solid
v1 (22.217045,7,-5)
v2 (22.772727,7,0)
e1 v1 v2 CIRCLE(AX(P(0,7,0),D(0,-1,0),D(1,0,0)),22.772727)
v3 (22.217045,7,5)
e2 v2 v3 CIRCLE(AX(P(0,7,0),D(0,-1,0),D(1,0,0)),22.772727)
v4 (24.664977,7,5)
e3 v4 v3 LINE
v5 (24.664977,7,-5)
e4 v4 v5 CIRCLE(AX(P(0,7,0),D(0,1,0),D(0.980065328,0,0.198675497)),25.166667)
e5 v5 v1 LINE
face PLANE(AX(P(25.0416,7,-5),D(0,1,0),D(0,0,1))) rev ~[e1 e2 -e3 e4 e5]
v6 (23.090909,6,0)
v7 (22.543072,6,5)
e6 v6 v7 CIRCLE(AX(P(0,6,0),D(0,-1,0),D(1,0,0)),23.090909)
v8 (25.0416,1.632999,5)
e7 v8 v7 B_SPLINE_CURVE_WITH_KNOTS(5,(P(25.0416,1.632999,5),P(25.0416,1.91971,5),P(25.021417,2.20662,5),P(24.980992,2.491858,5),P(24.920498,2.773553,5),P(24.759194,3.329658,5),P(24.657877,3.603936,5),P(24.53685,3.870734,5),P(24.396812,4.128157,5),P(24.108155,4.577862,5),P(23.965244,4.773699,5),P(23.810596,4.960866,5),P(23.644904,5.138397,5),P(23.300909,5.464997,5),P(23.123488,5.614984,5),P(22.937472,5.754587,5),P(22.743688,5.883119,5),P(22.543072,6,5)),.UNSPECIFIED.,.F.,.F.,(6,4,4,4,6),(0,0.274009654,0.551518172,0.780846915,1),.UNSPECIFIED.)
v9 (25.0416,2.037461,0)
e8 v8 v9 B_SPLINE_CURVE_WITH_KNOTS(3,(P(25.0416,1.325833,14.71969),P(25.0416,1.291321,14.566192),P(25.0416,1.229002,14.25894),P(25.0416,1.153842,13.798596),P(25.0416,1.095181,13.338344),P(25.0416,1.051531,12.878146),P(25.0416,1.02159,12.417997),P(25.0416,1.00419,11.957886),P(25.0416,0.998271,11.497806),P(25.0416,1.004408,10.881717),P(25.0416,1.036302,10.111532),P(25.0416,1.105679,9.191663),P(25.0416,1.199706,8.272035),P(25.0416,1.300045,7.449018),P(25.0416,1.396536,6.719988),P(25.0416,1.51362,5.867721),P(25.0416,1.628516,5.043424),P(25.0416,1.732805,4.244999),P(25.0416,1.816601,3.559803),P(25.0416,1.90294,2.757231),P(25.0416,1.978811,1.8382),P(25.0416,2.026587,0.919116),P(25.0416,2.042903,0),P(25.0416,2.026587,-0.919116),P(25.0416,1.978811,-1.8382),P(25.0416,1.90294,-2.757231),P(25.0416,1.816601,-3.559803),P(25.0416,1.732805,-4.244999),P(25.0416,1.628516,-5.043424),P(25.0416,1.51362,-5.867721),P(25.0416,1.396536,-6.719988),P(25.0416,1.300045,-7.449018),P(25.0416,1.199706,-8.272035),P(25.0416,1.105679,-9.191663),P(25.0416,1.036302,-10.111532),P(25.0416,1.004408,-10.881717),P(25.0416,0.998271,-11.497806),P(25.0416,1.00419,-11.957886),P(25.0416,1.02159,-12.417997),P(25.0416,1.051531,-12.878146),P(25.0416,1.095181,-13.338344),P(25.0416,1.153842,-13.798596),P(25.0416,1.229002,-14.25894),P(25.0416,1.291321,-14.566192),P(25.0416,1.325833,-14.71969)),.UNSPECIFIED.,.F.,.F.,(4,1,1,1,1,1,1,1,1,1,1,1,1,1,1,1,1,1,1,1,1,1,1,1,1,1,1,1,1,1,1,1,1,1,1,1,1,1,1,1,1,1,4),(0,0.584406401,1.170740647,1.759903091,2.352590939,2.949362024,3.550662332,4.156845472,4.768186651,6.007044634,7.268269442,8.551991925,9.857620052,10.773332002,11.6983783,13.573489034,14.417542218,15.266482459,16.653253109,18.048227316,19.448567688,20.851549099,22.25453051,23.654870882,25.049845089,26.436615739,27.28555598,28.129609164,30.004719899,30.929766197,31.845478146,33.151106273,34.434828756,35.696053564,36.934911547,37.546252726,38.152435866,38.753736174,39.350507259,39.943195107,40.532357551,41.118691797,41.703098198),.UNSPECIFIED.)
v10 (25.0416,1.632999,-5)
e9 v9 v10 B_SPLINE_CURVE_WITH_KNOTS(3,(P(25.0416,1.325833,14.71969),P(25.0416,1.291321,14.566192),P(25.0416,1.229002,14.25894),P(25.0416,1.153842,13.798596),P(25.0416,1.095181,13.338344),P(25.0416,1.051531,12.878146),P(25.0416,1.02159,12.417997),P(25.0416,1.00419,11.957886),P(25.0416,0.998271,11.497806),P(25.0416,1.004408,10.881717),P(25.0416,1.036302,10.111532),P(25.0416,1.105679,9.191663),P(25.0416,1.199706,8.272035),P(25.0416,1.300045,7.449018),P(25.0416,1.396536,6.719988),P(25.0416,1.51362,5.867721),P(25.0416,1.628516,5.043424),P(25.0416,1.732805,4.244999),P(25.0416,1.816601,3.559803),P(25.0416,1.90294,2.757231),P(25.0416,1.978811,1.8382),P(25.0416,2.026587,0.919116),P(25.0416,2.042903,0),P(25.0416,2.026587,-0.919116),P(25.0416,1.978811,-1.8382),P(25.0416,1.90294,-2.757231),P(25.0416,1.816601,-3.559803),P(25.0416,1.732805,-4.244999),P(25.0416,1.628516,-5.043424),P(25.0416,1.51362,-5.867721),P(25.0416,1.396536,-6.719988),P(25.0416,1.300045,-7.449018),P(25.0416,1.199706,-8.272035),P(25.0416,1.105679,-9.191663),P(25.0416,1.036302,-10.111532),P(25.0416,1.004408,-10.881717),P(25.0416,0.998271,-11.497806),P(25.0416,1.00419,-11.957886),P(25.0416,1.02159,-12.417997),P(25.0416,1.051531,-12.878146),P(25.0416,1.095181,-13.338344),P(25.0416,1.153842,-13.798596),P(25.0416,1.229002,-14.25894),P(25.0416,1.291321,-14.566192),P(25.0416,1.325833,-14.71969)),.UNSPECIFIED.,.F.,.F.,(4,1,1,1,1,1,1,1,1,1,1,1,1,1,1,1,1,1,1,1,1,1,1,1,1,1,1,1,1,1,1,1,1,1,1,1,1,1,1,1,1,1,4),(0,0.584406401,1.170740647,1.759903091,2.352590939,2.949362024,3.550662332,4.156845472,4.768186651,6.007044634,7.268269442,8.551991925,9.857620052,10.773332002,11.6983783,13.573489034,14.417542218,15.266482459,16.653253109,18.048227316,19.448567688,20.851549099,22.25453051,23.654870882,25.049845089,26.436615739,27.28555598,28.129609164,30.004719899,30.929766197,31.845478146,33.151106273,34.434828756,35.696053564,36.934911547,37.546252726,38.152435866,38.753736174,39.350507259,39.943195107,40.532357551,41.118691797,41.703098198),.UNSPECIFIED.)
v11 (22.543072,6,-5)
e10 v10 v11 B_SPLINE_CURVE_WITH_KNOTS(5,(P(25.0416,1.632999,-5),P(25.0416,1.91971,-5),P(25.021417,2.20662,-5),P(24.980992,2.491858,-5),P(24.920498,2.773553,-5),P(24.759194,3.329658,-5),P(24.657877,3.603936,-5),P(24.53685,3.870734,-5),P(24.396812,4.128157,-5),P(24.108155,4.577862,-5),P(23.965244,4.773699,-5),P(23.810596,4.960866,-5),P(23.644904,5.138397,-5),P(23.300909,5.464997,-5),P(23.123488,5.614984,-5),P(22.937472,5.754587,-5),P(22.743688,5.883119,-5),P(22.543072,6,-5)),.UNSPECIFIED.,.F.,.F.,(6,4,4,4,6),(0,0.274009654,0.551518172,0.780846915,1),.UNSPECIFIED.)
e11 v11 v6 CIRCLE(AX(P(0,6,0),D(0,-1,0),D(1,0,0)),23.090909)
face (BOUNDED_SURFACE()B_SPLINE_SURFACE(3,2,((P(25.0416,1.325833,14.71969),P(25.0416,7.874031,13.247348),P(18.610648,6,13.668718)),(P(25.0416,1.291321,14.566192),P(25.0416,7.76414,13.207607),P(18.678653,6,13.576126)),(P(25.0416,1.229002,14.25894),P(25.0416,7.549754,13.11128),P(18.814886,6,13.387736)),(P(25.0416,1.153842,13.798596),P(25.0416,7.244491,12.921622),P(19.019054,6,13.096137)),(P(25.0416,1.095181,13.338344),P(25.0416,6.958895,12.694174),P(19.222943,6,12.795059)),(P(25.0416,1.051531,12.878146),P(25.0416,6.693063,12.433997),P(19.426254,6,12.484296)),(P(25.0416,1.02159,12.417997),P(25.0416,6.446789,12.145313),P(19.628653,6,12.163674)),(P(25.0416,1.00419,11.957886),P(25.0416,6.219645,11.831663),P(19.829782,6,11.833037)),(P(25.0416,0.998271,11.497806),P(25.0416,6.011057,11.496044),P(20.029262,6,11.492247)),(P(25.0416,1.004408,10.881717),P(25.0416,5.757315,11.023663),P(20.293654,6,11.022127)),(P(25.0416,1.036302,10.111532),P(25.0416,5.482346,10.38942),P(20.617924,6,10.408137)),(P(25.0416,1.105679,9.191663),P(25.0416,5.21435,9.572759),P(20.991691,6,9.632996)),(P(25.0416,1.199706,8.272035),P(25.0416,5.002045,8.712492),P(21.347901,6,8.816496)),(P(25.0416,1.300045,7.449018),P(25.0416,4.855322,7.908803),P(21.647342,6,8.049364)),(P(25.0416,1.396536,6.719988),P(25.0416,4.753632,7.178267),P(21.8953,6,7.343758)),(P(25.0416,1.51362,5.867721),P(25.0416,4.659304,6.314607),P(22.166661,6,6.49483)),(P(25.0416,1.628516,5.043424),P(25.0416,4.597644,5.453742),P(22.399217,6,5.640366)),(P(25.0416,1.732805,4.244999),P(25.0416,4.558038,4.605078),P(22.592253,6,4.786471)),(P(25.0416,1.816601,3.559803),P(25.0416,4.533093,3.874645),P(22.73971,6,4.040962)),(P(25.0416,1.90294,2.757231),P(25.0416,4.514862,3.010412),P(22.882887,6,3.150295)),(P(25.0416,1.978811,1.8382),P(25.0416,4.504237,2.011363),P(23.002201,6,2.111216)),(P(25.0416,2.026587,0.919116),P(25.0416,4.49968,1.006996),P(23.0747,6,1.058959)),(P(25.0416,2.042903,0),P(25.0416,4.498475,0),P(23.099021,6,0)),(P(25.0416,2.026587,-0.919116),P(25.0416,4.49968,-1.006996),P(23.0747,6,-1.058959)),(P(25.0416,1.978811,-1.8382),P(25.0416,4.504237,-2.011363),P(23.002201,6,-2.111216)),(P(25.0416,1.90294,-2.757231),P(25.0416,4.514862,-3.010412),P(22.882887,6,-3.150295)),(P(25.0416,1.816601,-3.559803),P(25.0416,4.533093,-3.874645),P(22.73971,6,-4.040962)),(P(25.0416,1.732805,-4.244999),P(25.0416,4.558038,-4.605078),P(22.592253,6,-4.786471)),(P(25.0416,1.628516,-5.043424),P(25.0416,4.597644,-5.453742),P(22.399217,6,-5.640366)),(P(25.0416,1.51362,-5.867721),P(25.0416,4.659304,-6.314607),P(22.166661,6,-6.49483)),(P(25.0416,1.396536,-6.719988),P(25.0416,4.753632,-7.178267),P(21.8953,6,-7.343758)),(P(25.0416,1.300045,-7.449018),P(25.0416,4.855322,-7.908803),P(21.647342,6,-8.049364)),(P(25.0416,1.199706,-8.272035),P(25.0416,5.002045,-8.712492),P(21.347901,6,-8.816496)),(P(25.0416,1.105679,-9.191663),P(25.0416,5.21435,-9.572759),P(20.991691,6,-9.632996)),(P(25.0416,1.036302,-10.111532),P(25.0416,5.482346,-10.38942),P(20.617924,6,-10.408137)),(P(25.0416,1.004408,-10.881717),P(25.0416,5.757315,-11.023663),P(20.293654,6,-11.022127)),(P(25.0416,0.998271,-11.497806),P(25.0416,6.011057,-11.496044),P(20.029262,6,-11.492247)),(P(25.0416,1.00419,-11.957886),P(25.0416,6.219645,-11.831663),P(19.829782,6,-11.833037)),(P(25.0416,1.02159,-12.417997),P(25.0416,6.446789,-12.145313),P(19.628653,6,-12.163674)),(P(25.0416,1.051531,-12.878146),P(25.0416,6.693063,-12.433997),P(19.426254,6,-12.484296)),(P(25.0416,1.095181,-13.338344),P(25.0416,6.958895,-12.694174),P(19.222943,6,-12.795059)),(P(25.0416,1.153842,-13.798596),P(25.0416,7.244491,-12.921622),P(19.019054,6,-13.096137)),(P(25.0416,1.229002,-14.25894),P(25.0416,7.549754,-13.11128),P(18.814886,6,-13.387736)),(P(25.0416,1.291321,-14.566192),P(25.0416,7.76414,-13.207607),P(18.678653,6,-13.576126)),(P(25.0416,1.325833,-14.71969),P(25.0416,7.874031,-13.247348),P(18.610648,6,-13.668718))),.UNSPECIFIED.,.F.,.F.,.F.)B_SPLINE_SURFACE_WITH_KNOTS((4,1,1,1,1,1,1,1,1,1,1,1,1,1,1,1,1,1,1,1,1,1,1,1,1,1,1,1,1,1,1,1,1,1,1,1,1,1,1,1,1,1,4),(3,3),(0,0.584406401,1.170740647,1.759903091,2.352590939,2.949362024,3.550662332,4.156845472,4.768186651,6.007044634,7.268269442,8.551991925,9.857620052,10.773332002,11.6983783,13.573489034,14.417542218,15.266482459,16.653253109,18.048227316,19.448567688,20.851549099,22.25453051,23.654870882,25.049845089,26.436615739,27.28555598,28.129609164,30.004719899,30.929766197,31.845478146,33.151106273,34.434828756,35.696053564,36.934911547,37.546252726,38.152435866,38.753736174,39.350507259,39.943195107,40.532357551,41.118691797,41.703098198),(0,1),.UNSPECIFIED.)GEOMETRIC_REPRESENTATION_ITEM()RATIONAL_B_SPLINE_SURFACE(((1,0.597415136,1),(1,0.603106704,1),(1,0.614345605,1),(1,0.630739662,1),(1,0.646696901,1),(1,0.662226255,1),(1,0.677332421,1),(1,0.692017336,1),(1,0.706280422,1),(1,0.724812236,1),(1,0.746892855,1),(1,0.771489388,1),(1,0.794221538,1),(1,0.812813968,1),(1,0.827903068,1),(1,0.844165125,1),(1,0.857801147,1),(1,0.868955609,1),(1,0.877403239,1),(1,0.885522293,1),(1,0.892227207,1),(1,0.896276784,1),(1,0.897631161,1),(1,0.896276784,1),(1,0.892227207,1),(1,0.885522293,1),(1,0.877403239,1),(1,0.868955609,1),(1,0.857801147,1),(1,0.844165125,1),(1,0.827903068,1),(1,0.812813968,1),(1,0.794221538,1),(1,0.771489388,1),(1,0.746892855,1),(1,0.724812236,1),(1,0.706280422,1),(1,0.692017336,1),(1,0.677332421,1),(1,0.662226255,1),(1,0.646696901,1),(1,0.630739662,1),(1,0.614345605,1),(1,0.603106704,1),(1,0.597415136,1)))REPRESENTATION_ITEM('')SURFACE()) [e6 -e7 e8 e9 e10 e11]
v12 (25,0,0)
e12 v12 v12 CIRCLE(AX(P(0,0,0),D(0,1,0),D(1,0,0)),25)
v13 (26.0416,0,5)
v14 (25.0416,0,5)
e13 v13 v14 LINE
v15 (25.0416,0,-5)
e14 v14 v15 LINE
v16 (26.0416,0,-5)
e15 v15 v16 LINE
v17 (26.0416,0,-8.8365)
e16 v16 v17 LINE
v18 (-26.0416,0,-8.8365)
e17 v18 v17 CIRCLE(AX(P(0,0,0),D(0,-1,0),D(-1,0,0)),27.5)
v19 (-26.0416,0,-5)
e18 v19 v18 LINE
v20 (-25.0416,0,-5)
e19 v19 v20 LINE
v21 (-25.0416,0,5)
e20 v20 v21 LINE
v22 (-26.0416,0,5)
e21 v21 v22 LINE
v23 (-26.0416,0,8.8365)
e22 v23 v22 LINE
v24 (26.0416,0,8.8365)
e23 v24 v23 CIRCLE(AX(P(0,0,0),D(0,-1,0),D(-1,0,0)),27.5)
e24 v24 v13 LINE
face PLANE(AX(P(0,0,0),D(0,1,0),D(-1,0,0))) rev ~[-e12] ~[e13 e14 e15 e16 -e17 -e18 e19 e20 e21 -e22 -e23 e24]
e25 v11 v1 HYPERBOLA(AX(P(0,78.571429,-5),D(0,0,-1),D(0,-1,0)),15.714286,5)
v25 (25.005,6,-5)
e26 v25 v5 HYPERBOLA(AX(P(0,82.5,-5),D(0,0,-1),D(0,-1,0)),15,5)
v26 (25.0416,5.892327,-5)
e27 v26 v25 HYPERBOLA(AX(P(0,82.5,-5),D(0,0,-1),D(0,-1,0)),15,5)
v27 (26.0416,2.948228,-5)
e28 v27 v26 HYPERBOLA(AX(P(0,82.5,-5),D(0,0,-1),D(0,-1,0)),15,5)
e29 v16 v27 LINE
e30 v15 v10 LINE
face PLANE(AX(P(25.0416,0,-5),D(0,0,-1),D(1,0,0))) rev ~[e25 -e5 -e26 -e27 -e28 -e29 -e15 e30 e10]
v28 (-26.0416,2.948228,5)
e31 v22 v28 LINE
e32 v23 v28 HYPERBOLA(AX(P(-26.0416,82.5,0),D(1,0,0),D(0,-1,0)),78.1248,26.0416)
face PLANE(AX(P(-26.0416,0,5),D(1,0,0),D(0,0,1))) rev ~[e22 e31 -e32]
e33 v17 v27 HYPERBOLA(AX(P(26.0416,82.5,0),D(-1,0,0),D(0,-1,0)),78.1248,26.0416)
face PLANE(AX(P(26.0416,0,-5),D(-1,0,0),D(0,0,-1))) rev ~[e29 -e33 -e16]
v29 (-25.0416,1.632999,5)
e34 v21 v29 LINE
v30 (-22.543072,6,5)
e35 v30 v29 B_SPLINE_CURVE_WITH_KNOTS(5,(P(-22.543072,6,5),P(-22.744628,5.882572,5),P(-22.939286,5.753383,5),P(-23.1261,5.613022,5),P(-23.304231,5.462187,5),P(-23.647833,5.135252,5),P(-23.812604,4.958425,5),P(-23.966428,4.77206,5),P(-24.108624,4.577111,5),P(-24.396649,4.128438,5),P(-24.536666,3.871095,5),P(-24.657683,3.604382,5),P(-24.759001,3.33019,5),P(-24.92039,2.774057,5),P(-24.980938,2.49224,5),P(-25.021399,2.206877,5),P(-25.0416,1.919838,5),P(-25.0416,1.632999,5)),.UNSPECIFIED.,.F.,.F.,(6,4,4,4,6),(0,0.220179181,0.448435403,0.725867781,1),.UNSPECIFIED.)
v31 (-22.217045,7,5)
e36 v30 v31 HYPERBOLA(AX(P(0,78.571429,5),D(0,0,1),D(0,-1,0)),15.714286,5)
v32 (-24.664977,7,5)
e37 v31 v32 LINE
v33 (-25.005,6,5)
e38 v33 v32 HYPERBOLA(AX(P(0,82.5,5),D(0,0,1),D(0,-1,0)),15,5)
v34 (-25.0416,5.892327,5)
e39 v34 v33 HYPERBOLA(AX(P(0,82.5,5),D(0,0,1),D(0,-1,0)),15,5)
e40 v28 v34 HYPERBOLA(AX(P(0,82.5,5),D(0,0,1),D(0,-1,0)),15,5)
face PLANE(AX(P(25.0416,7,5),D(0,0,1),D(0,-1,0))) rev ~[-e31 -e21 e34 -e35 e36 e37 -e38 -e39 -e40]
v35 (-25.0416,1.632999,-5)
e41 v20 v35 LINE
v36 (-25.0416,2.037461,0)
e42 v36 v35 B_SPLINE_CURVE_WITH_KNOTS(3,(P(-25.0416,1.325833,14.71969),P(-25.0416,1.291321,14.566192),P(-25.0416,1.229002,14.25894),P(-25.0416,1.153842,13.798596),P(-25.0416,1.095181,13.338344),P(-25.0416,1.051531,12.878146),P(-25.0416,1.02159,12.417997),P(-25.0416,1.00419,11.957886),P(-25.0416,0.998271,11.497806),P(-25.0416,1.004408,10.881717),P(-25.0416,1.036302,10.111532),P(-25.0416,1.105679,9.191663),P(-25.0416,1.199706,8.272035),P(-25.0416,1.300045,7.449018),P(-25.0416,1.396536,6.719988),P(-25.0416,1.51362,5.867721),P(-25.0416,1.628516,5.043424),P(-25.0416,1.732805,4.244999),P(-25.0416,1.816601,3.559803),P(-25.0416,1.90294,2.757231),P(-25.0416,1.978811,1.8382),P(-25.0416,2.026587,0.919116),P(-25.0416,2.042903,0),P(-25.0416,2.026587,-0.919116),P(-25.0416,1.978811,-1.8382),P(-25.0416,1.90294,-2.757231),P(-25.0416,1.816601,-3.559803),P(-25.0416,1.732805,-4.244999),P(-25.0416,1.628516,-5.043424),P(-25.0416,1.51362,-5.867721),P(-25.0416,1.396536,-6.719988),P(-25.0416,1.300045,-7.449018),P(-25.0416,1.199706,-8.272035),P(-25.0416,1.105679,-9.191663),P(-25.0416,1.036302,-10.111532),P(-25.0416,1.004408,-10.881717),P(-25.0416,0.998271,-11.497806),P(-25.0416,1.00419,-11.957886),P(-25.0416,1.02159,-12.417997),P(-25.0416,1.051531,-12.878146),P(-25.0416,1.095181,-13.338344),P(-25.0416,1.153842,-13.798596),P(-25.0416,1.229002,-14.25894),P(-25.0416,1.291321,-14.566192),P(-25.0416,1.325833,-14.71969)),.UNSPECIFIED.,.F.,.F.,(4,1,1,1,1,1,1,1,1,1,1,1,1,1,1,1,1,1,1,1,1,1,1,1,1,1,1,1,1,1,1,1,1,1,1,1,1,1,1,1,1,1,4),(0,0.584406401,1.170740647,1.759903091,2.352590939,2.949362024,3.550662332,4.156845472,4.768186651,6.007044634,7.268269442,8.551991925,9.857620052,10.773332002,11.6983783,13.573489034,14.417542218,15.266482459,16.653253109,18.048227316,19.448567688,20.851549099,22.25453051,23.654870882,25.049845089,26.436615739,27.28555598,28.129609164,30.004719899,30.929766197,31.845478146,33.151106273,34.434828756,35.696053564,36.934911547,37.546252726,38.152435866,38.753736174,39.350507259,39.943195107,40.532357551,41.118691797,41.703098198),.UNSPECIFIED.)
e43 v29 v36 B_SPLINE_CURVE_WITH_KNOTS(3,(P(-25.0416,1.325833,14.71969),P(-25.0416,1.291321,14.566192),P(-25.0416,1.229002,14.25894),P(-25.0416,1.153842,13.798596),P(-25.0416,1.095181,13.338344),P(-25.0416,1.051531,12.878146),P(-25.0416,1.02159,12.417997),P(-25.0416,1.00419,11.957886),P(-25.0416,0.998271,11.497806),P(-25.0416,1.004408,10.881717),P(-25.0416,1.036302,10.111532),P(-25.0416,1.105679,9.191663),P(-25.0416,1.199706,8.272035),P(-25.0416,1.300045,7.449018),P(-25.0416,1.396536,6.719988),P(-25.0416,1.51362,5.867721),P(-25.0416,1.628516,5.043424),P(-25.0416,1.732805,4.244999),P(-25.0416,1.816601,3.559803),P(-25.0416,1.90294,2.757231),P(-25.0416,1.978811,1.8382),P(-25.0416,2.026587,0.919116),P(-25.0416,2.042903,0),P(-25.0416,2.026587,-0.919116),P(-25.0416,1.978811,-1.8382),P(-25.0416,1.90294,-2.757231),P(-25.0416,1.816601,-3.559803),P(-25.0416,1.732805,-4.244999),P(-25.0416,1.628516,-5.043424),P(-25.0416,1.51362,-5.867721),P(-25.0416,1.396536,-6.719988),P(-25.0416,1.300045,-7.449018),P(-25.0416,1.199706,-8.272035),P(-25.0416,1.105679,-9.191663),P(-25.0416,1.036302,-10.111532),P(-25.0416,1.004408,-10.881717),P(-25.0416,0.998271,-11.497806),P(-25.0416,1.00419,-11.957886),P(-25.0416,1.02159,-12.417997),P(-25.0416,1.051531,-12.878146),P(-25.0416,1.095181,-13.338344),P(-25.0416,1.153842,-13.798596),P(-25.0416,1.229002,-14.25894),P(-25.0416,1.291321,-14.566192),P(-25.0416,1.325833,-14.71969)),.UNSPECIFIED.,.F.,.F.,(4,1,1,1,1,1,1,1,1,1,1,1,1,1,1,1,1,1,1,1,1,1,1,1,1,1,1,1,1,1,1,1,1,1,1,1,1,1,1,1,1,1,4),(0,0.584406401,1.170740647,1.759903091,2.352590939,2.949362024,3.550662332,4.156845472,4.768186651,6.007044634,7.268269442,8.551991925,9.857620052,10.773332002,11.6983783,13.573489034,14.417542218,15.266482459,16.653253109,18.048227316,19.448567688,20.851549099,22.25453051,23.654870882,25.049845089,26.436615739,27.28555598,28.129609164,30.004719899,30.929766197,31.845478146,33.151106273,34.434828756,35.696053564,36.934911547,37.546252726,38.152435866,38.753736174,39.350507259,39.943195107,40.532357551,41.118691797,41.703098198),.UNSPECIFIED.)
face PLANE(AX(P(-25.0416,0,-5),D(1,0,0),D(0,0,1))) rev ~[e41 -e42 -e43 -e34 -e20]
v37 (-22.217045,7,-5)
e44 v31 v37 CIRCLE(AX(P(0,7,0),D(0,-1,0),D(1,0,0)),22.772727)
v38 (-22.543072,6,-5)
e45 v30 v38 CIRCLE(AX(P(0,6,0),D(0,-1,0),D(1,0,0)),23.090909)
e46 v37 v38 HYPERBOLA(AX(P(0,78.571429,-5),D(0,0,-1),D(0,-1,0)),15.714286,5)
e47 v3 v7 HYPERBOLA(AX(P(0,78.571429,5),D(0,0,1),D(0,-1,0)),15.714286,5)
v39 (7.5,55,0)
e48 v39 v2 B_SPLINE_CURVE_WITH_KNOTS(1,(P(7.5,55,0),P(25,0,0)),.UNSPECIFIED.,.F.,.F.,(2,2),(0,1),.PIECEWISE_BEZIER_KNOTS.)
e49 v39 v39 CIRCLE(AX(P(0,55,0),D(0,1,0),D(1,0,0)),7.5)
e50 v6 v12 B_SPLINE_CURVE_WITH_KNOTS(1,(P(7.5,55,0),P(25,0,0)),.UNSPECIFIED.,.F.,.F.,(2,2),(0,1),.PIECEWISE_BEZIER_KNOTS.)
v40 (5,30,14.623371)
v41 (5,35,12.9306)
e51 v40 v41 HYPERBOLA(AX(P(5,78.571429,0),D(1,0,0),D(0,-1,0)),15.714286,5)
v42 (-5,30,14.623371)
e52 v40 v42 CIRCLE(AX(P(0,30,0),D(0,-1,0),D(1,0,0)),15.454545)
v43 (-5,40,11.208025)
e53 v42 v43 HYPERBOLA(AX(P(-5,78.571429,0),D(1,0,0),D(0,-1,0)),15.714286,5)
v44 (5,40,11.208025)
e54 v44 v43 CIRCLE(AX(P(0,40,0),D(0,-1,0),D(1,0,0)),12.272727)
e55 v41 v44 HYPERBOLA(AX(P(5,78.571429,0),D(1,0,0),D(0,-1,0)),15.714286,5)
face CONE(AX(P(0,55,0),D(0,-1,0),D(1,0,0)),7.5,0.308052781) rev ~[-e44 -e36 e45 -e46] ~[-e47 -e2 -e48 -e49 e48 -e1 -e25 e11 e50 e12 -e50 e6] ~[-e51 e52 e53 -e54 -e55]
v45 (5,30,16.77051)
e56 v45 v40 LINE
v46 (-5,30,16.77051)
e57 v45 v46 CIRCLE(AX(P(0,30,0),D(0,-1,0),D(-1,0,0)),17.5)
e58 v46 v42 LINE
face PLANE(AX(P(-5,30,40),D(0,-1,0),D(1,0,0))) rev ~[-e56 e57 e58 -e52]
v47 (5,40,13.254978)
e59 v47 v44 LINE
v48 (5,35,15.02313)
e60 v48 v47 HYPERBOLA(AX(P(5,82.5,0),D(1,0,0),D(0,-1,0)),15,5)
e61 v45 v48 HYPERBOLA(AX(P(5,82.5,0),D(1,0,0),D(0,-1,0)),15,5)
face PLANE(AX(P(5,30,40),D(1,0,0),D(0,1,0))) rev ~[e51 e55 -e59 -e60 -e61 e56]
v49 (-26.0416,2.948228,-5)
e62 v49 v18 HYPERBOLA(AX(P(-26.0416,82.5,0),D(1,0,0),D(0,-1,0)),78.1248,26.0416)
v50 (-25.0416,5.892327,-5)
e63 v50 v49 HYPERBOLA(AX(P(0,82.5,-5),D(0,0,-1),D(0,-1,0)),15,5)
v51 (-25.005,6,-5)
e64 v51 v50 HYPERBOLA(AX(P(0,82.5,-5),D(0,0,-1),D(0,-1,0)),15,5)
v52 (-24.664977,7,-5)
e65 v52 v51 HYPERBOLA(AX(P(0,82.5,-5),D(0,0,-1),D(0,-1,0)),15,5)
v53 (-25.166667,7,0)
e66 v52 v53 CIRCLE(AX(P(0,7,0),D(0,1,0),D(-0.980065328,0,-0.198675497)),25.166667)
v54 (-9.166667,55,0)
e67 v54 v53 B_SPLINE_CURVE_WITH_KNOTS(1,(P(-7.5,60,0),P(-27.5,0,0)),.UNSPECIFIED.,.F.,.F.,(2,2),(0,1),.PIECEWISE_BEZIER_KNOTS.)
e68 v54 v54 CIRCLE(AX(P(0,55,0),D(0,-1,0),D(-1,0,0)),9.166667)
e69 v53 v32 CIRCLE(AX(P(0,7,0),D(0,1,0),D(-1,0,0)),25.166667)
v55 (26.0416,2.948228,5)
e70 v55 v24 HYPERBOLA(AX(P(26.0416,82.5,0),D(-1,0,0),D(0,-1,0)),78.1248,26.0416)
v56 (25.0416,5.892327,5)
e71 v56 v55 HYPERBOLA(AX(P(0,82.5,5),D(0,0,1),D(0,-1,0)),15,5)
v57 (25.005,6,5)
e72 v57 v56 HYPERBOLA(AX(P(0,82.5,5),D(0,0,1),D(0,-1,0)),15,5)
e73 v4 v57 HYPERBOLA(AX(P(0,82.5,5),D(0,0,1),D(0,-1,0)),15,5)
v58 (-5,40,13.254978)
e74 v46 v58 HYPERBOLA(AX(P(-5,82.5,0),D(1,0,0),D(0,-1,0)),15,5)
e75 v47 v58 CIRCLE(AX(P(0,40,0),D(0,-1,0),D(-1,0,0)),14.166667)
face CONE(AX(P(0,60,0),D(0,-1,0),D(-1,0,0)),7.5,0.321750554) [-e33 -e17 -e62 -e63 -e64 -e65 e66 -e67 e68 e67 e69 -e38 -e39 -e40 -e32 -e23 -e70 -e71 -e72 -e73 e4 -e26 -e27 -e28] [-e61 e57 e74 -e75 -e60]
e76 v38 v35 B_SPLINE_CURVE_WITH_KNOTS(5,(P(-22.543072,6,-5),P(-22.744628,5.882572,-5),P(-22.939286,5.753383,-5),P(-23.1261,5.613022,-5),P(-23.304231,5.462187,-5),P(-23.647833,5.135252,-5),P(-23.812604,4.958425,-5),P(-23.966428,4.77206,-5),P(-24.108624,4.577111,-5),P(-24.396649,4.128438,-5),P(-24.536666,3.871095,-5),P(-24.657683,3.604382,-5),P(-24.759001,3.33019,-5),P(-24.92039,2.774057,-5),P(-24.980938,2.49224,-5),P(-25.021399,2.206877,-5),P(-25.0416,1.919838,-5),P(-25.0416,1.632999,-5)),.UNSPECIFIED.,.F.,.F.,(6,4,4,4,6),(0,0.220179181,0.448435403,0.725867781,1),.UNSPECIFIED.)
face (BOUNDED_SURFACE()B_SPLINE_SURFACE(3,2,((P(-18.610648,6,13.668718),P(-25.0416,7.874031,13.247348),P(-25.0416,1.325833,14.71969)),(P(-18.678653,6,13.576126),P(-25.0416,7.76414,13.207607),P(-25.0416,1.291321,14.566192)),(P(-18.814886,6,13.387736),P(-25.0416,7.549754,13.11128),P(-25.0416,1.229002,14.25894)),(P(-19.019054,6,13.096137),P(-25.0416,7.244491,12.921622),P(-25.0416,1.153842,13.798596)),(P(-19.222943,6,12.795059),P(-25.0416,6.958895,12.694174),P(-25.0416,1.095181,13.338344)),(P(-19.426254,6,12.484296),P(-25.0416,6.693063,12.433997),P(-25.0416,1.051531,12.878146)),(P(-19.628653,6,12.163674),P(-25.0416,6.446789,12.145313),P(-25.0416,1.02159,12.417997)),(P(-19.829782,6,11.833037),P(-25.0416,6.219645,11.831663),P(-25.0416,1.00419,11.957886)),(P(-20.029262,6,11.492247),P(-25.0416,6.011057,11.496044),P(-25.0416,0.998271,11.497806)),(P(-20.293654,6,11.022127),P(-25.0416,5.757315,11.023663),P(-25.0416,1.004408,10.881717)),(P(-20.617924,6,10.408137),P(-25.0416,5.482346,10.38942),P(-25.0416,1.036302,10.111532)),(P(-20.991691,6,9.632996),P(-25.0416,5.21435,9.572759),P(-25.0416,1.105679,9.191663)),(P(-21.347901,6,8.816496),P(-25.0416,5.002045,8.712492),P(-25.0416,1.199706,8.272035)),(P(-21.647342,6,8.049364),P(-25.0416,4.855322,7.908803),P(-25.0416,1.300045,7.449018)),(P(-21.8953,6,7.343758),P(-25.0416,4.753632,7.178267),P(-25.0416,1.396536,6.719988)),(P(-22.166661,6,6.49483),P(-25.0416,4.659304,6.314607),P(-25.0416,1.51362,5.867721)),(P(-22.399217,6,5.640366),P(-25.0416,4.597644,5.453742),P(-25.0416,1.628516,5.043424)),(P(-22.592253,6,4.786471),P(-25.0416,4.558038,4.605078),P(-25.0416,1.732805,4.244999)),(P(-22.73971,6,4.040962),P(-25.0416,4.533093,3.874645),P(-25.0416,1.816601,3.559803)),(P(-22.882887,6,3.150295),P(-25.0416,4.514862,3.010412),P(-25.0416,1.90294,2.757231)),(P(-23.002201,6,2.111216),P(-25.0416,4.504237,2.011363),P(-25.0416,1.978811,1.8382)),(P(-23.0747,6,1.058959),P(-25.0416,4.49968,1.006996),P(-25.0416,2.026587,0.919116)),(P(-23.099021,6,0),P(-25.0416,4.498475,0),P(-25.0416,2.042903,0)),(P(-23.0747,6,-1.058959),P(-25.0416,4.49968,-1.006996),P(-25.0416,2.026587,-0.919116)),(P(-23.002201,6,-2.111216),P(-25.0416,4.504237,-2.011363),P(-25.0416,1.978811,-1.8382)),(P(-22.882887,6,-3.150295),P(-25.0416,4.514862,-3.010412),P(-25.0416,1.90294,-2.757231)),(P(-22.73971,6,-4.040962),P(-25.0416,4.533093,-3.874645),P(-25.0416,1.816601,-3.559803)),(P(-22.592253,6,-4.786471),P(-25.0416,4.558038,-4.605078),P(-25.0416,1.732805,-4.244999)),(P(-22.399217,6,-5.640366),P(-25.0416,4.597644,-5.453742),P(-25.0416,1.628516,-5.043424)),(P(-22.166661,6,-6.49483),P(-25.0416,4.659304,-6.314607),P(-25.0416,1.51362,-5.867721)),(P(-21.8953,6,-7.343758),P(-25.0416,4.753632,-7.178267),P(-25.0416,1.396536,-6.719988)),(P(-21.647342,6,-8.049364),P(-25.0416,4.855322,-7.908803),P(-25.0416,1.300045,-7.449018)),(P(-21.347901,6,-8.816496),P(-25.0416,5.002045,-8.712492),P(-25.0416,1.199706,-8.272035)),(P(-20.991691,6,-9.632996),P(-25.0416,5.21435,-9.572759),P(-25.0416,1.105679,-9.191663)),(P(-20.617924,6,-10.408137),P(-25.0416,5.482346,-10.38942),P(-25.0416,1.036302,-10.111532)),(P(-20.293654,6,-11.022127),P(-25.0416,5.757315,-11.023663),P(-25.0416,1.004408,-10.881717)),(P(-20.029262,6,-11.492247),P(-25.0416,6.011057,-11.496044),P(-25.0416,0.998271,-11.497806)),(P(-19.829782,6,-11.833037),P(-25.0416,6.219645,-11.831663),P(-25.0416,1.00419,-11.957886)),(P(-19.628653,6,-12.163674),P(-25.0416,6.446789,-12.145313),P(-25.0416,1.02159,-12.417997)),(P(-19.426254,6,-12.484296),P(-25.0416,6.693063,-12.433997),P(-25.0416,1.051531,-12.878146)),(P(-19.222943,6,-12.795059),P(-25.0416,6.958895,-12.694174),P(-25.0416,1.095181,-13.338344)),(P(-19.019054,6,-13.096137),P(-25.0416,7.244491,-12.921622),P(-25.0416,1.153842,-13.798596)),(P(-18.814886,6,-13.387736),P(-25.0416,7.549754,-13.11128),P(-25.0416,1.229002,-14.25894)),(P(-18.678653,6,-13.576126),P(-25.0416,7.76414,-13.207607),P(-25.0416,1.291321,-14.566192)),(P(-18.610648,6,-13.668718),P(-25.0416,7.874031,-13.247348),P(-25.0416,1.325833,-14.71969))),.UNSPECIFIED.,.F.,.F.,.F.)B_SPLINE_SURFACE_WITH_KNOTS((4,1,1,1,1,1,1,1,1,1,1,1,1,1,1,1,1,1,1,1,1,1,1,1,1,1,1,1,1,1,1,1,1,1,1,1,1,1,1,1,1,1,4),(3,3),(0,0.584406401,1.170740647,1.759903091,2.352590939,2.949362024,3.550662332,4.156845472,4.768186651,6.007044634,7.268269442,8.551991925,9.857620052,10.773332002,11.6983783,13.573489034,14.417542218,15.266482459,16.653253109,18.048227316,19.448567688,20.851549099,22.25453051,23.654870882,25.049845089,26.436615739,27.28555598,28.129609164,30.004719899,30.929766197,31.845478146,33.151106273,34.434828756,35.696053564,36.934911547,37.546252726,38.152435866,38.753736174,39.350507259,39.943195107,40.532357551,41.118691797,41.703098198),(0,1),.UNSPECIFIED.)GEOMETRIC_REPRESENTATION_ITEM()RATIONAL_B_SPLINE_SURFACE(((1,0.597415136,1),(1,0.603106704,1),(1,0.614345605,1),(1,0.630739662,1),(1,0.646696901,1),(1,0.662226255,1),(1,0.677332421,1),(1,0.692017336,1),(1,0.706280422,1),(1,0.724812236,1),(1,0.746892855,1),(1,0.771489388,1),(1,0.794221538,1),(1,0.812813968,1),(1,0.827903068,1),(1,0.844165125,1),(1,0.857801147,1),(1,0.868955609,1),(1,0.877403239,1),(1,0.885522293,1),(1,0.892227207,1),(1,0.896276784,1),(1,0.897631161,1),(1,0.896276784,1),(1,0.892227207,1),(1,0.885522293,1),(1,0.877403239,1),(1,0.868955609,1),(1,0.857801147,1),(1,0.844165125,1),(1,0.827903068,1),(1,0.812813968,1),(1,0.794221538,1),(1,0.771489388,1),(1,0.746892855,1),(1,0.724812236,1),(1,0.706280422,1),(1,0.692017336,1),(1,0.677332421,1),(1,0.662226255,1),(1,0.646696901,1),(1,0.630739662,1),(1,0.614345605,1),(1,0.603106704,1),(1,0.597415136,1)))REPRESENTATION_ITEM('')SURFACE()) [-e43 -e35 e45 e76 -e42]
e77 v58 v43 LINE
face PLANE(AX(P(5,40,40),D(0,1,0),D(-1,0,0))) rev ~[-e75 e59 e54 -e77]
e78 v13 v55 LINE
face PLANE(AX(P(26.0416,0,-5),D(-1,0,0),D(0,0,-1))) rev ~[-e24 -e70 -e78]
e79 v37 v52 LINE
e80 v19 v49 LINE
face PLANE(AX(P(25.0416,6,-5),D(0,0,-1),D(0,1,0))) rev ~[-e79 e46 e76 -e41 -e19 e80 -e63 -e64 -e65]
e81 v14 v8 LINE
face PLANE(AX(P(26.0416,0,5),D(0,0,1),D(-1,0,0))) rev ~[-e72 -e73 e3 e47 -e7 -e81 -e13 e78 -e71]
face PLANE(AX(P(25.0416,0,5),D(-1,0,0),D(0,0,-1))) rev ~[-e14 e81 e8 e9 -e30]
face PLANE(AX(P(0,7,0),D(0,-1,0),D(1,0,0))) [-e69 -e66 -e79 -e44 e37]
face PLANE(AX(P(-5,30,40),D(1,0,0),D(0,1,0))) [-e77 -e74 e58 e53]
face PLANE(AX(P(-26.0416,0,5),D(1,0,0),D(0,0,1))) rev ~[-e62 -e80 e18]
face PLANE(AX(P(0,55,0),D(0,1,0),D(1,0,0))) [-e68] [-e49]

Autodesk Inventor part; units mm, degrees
ref_plane "YZ Plane" through (0, 0, 0) normal (1, 0, 0) x (0, 1, 0)
ref_plane "XZ Plane" through (0, 0, 0) normal (0, 1, 0) x (-1, 0, 0)
ref_plane "XY Plane" through (0, 0, 0) normal (0, 0, 1) x (1, 0, 0)
sketch "Sketch1" plane through (0, 0, 0) normal (0, 1, 0) x (-1, 0, 0)
  point P0 (0, 0)
sketch "Sketch2" plane through (0, 0, 0) normal (0, 1, 0) x (-1, 0, 0)
  circle A0 centre (0, 0) radius 7.5
  dimension "d0" = 15
extrude "Extrusion1" add sketch "Sketch2" along normal blind 60
sketch "Sketch3" plane through (0, 60, 0) normal (0, 1, 0) x (1, 0, 0)
  circle A0 centre (0, 0) radius 7.5
sketch "Sketch4" plane through (0, 0, 0) normal (0, -1, 0) x (1, 0, 0)
  circle A0 centre (0, 0) radius 25
  circle A1 centre (0, 0) radius 7.5 projected
  circle A2 centre (0, 0) radius 27.5
  dimension "d3" = 50
  dimension "d4" = 55
loft "Loft1" add profiles "Sketch4" section 1 edges at (7.5, 60, 0) contours A0 | A1 | A2
sketch "Sketch5" plane through (0, 0, 0) normal (0, -1, 0) x (1, 0, 0)
  circle A0 centre (0, 0) radius 7.5 projected
  circle A1 centre (0, 0) radius 27.5
  circle A2 centre (0, 0) radius 25
  circle A3 centre (0, 0) radius 7.5
  dimension "d9" = 50
  dimension "d10" = 15
sketch "Sketch6" plane through (0, 60, 0) normal (0, 1, 0) x (1, 0, 0)
  circle A0 centre (0, 0) radius 7.5
extrude "Extrusion2" cut sketch "Sketch6" against normal blind 5
sketch "Sketch7" plane through (0, 55, 0) normal (0, 1, 0) x (1, 0, 0)
  circle A0 centre (0, 0) radius 7.5
  line L0 (-11.197, -10.4421) -> (10.2744, -10.4421)
  line L1 (10.2744, -10.4421) -> (10.2744, 11.5325)
  line L2 (10.2744, 11.5325) -> (-11.197, 11.5325)
  line L3 (-11.197, 11.5325) -> (-11.197, -10.4421)
loft "Loft2" cut profiles "Sketch5" section 1 edges at (-7.5, 55, 0) contours A0 | A2
extrude "Extrusion3" cut sketch "Sketch7" along normal through all
sketch "Sketch8" plane through (0, 0, 0) normal (0, -1, 0) x (1, 0, 0)
  circle A0 centre (0, 0) radius 25
  circle A1 centre (0, 0) radius 27.5
  line L0 (27.5, 0) -> (27.5, -5)
  line L1 (27.0416, -5) -> (26.0416, -5)
  line L2 (26.0416, -5) -> (26.0416, 5)
  line L3 (26.0416, 5) -> (27.0416, 5)
  line L4 (27.0416, 5) -> (27.0416, -5)
  line L5 (-27.5, 0) -> (-27.5, -5)
  line L6 (-27.0416, -5) -> (-26.0416, -5)
  line L7 (-26.0416, -5) -> (-26.0416, 5)
  line L8 (-26.0416, 5) -> (-27.0416, 5)
  line L9 (-27.0416, 5) -> (-27.0416, -5)
  line L10 (26.0416, -5) -> (25.0416, -5)
  line L11 (25.0416, -5) -> (25.0416, 5)
  line L12 (25.0416, 5) -> (26.0416, 5)
  line L13 (26.0416, 5) -> (26.0416, -5)
  line L14 (-26.0416, -5) -> (-25.0416, -5)
  line L15 (-25.0416, -5) -> (-25.0416, 5)
  line L16 (-25.0416, 5) -> (-26.0416, 5)
  line L17 (-26.0416, 5) -> (-26.0416, -5)
  line L18 (-26.0416, 5) -> (-26.0416, 8.8365)
  line L19 (-26.0416, -5) -> (-26.0416, -8.8365)
  line L20 (26.0416, -5) -> (26.0416, -8.8365)
  line L21 (26.0416, 5) -> (26.0416, 8.8365)
  circle A2 centre (0, 0) radius 27.5 projected
  dimension "d19" = 5
  dimension "d20" = 1
  dimension "d21" = 10
  dimension "d22" = 5
  dimension "d23" = 1
  dimension "d24" = 10
  dimension "d25" = 1
  dimension "d26" = 1
extrude "Extrusion4" cut sketch "Sketch8" against normal through all contours A1 L4 | L3 L21 A1 | L4 L1 L2 L3 | A1 L20 L1 | L18 L8 A1 | A1 L6 L19 | L9 A1 | L8 L7 L6 L9
sketch "Sketch9" plane through (0, 0, 0) normal (0, -1, 0) x (1, 0, 0)
  circle A0 centre (0, 0) radius 27.5
  circle A1 centre (0, 0) radius 25
  line L0 (27.5, 0) -> (27.5, -5)
  line L1 (26.0416, -8.8365) -> (26.0416, 8.8365) projected
  line L2 (27.0416, -5) -> (26.0416, -5)
  line L3 (26.0416, -5) -> (26.0416, 5)
  line L4 (26.0416, 5) -> (27.0416, 5)
  line L5 (27.0416, 5) -> (27.0416, -5)
  line L6 (26.0416, 5) -> (25.0416, 5)
  line L7 (25.0416, 5) -> (25.0416, -5)
  line L8 (25.0416, -5) -> (26.0416, -5)
  line L9 (26.0416, -5) -> (26.0416, 5)
  line L10 (-27.5, 0) -> (-27.5, -5)
  line L11 (-26.0416, 8.8365) -> (-26.0416, -8.8365) projected
  line L12 (-27.0416, -5) -> (-26.0416, -5)
  line L13 (-26.0416, -5) -> (-26.0416, 5)
  line L14 (-26.0416, 5) -> (-27.0416, 5)
  line L15 (-27.0416, 5) -> (-27.0416, -5)
  line L16 (-26.0416, -5) -> (-25.0416, -5)
  line L17 (-25.0416, -5) -> (-25.0416, 5)
  line L18 (-25.0416, 5) -> (-26.0416, 5)
  line L19 (-26.0416, 5) -> (-26.0416, -5)
  dimension "d29" = 5
  dimension "d30" = 10
  dimension "d31" = 1
  dimension "d32" = 5
  dimension "d33" = 10
  dimension "d34" = 1
extrude "Extrusion5" cut sketch "Sketch9" against normal blind 7 contours L1 L8 L7 L6 | L18 L17 L16 L11
sketch "Sketch10" plane through (25.0416, 0, 5) normal (1, 0, 0) x (0, 0, -1)
  line L0 (0, 0) -> (10, 0)
  line L1 (10, 0) -> (10, 7)
  line L2 (10, 7) -> (0, 7)
  line L3 (0, 7) -> (0, 0)
  line L4 (10, 7) -> (0, 7)
  line L5 (0, 7) -> (0, 6)
  line L6 (0, 6) -> (10, 6)
  line L7 (10, 6) -> (10, 7)
  point P0 (5, 0)
  dimension "d37" = 10
  dimension "d38" = 7
  dimension "d39" = 1
extrude "Extrusion6" cut sketch "Sketch10" against normal through all contours L3 L2 L1 L6
fillet "Fillet1" radius 5 1 edges at (25.0416, 6, 0)
fillet "Fillet2" radius 5 1 edges at (-25.0416, 6, 0)
sketch "Sketch11" plane through (0, 0, 0) normal (0, -1, 0) x (1, 0, 0)
  line L0 (0, 0) -> (35, 0)
  line L1 (35, 0) -> (-35, 0)
  line L2 (-35, 0) -> (-35, 30)
  line L3 (-35, 30) -> (35, 30)
  line L4 (35, 30) -> (35, 0)
  line L5 (0, 30) -> (5, 30)
  line L6 (5, 30) -> (-5, 30)
  line L7 (-5, 30) -> (-5, 40)
  line L8 (-5, 40) -> (5, 40)
  line L9 (5, 40) -> (5, 30)
  dimension "d44" = 35
  dimension "d45" = 70
  dimension "d46" = 30
  dimension "d47" = 5
  dimension "d48" = 10
  dimension "d49" = 10
extrude "Extrusion7" add sketch "Sketch11" against normal blind 50 contours L3 L7 L8 L9
sketch "Sketch12" plane through (5, 0, 40) normal (1, 0, 0) x (0, 0, -1)
  line L0 (10, 0) -> (10, 50) projected
  line L1 (10, 0) -> (10, 35)
  line L2 (10, 35) -> (0, 35)
  line L3 (0, 0) -> (0, 50) projected
  point P0 (40, 0)
  dimension "d52" = 35
sketch "Sketch13" plane through (5, 0, 30) normal (0, 0, -1) x (-1, 0, 0)
  point P0 (5, 0)
sketch "Sketch14" plane through (-5, 0, 40) normal (0, 0, 1) x (1, 0, 0)
  line L0 (10, 0) -> (10, 50) projected
  line L1 (10, 35) -> (10, 40)
  line L2 (0, 0) -> (0, 50) projected
  line L3 (10, 40) -> (0, 40)
  line L4 (0, 40) -> (0, 30)
  line L5 (0, 30) -> (10, 30)
  line L6 (10, 30) -> (10, 40)
  point P0 (5, 0)
  dimension "d53" = 5
  dimension "d54" = 10
extrude "Extrusion8" cut sketch "Sketch14" against normal blind 35
sketch "Sketch15" plane through (0, 50, 0) normal (0, 1, 0) x (1, 0, 0)
  line L0 (5, -30) -> (-5, -30) projected
  line L1 (-5, -40) -> (5, -40) projected
  line L2 (-5, -30) -> (5, -30)
  line L3 (5, -30) -> (5, -40)
  line L4 (5, -40) -> (-5, -40)
  line L5 (-5, -40) -> (-5, -30)
  point P0 (0, 0)
extrude "Extrusion9" cut sketch "Sketch15" against normal through all
properties part number "cone_p3_testpart1_3DPrint"
